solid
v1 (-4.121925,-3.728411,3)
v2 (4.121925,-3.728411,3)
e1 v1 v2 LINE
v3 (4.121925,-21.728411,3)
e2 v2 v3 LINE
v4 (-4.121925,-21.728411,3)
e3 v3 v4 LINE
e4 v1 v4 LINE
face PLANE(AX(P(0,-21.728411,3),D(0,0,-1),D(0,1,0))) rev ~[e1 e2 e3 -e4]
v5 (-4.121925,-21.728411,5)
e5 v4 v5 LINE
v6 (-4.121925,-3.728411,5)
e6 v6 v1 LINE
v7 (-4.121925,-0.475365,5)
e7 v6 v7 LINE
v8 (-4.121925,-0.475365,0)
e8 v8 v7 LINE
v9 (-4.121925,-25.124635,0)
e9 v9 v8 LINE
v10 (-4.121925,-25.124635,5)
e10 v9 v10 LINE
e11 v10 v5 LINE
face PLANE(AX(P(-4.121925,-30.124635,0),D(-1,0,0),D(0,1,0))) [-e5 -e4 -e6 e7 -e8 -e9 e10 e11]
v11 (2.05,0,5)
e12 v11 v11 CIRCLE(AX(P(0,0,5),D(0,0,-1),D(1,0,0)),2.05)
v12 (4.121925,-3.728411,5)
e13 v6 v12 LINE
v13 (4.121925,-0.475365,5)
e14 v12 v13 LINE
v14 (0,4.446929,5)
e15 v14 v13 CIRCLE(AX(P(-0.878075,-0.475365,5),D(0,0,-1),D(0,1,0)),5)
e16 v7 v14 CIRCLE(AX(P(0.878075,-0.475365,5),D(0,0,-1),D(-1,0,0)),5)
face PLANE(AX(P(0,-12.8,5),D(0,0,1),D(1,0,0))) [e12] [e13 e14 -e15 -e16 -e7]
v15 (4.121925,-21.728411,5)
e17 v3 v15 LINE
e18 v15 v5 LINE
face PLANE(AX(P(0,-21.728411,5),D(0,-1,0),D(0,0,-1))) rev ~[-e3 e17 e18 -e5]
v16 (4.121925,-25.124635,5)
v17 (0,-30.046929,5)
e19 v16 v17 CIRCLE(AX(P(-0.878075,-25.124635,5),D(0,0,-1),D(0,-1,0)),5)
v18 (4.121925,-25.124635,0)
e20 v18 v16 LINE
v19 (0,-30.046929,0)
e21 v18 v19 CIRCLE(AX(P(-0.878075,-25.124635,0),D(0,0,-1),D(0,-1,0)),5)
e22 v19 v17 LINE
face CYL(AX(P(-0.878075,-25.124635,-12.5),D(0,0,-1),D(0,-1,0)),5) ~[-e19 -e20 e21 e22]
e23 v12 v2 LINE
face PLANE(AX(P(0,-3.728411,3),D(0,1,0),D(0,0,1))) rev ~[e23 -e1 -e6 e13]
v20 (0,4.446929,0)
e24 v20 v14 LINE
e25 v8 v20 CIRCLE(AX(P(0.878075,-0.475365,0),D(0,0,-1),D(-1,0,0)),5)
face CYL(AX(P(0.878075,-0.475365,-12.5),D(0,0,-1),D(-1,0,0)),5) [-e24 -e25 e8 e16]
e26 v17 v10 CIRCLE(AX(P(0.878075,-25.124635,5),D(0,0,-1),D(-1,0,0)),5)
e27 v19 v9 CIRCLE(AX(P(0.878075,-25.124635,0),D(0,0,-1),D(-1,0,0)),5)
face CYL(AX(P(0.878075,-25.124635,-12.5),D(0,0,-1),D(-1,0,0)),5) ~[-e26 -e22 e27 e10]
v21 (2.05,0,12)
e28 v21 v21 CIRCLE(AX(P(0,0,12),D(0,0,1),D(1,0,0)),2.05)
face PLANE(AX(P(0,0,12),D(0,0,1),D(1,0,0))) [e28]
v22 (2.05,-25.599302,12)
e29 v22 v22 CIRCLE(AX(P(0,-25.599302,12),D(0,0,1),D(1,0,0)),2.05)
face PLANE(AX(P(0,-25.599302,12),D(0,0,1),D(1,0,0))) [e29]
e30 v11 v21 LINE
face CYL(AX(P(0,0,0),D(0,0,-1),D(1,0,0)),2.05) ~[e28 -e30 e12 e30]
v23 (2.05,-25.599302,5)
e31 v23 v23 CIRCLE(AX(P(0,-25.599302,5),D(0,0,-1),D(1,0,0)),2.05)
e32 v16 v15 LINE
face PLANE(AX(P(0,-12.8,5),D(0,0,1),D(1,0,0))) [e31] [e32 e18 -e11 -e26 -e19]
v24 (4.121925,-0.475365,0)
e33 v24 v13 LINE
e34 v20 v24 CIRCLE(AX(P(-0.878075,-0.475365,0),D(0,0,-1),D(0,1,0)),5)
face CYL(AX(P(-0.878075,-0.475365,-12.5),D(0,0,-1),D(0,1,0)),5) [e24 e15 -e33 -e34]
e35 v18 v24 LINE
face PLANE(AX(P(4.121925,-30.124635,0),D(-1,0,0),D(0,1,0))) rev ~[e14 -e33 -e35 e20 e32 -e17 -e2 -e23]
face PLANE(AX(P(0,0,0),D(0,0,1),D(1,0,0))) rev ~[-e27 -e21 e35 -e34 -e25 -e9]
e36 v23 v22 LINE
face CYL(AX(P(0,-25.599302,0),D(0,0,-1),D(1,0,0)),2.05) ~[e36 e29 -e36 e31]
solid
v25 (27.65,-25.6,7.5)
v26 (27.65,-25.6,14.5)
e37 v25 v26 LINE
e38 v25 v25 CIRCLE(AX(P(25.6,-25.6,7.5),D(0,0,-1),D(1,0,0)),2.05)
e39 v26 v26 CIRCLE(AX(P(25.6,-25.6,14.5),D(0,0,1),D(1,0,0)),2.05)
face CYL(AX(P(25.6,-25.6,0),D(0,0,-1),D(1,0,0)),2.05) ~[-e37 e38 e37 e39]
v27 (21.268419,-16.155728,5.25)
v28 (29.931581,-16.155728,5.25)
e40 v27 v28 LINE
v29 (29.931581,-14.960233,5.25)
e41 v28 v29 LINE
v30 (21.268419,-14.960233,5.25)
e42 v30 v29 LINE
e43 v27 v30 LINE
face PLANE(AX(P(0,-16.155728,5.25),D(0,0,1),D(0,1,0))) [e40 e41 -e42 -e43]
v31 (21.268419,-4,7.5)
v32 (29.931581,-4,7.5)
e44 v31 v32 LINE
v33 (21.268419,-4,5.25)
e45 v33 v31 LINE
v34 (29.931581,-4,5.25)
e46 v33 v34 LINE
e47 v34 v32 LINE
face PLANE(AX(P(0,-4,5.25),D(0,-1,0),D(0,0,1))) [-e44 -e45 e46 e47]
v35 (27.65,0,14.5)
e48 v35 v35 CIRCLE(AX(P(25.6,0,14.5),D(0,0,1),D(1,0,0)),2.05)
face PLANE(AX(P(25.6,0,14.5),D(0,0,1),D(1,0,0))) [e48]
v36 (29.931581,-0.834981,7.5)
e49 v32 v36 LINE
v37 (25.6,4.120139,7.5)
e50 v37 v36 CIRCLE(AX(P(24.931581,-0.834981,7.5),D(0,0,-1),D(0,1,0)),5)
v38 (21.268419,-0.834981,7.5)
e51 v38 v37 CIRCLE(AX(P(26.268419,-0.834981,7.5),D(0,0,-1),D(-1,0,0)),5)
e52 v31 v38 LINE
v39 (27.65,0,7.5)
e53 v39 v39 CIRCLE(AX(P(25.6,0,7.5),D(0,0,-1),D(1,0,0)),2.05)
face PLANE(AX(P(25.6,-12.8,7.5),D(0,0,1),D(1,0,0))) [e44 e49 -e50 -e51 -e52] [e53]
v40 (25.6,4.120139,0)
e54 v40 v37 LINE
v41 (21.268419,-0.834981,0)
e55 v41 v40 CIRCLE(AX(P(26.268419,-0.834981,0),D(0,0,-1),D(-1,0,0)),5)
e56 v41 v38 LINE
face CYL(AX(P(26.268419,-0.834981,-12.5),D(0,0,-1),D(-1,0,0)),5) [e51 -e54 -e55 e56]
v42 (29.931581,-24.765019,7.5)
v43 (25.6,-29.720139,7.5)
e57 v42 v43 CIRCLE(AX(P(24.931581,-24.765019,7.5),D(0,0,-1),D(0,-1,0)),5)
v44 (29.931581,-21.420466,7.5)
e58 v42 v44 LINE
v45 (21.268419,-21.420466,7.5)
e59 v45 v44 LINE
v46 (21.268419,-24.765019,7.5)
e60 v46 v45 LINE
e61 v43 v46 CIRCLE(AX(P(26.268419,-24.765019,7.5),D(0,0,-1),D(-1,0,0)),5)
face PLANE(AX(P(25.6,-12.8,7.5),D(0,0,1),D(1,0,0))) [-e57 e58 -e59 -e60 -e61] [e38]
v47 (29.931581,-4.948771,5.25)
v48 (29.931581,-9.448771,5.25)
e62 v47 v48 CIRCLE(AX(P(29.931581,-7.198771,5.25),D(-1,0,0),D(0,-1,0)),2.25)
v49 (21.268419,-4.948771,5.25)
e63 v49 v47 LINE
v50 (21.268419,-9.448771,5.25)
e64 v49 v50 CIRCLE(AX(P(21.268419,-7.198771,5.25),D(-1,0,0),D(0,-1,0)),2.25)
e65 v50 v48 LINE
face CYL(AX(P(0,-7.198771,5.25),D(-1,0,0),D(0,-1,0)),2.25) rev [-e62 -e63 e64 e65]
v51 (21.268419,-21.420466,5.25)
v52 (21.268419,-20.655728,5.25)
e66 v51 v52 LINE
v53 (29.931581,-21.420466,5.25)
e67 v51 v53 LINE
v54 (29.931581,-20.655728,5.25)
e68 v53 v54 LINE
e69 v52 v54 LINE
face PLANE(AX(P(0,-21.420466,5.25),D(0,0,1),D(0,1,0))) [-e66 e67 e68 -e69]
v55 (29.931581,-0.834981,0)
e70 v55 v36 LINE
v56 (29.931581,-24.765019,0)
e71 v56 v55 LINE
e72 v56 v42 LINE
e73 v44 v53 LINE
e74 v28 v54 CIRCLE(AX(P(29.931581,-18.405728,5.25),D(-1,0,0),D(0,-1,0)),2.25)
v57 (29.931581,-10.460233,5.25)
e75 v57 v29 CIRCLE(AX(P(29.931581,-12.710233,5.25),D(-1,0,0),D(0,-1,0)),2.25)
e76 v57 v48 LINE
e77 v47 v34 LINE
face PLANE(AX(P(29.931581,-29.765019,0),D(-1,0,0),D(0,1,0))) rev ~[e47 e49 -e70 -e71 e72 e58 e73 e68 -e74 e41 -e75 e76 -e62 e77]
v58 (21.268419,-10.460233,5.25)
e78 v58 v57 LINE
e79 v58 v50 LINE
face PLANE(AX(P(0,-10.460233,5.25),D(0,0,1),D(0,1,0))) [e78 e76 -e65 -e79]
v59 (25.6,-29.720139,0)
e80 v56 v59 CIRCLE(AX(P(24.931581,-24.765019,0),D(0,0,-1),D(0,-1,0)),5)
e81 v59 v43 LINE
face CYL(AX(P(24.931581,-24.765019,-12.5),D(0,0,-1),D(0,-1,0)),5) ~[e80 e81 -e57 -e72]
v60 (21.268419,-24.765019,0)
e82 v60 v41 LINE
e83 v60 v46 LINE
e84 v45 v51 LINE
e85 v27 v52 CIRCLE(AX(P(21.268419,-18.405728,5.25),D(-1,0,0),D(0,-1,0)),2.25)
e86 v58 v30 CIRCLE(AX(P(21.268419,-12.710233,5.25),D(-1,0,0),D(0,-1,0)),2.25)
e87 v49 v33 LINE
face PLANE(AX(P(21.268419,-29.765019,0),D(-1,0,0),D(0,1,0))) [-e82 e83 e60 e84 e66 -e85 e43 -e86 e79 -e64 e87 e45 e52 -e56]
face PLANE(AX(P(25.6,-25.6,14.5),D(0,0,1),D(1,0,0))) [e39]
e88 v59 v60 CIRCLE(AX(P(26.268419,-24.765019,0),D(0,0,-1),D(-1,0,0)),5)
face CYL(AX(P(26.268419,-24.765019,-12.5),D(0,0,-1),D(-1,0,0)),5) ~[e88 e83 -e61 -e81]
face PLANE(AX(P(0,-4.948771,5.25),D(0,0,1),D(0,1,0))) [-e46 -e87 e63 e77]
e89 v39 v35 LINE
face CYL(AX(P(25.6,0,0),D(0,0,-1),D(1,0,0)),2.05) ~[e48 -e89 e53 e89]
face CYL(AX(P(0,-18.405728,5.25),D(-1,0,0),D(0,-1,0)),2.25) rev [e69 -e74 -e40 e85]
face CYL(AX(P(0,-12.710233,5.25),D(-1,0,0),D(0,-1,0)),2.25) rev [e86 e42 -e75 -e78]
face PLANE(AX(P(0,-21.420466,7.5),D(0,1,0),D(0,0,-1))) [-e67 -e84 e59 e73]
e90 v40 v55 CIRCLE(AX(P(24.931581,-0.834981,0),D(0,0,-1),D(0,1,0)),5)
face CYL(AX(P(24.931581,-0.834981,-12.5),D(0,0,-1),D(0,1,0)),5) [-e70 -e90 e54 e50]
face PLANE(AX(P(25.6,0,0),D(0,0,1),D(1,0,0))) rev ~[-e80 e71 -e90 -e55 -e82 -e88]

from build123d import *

# Parameters (mm, degrees)
F0_W         = 8.2438504323
F0_H         = 34.6492690086
F1_DEPTH     = 5
F2_R         = 2.05
F3_DEPTH     = 12
F5_DEPTH     = 12.5
F6_T1_DEPTH  = 30
F7_W         = 8.6631612957
F7_H         = 33.9300383866
F7_R         = 2.05
F8_DEPTH     = 7.5
F9_DEPTH     = 14.5
F10_T1_DEPTH = 32.5
F12_DEPTH    = 29.9325806478


# Not quite as in the source:
# - a fillet or chamfer that OpenCascade refuses, or shapes differently, is made with other operations: its cross-section is extruded or revolved along the edge and cut away or added


with BuildPart() as f1:
    # F0 (on Top) → F1 (new body)
    with BuildSketch(Plane.XY):
        with Locations((0, -12.8)):
            Rectangle(F0_W, F0_H)
        with BuildLine():
            ThreePointArc((1.9, -25.6), (-1.3435028843, -26.9435028843), (0, -23.7))
            ThreePointArc((0, -23.7), (1.3435028843, -24.2564971157), (1.9, -25.6))
        make_face(mode=Mode.SUBTRACT)
        with BuildLine():
            ThreePointArc((0, -1.9), (-1.3435028843, 1.3435028843), (1.9, 0))
            ThreePointArc((1.9, 0), (1.3435028843, -1.3435028843), (0, -1.9))
        make_face(mode=Mode.SUBTRACT)
        with BuildLine():
            ThreePointArc((0, -1.9), (1.3435028843, -1.3435028843), (1.9, 0))
            ThreePointArc((1.9, 0), (-1.3435028843, 1.3435028843), (0, -1.9))
        make_face()
        with BuildLine():
            ThreePointArc((1.9, -25.6), (1.3435028843, -24.2564971157), (0, -23.7))
            ThreePointArc((0, -23.7), (-1.3435028843, -26.9435028843), (1.9, -25.6))
        make_face()
    extrude(amount=F1_DEPTH)

    # F2 (on Top) → F3 (join)
    with BuildSketch(Plane.XY):
        Circle(F2_R)
        with Locations((0, -25.5993018519)):
            Circle(F2_R)
    extrude(amount=F3_DEPTH)

    # F4 (on Right) → F5 (cut, symmetric)
    with BuildSketch(Plane.YZ):
        Polygon((-21.728410773, 3), (-12.728410773, 3), (-3.728410773, 3), (-3.728410773, 5), (-21.728410773, 5), align=None)
    extrude(amount=F5_DEPTH, both=True, mode=Mode.SUBTRACT)

    # F6: fillet of radius 5 on 4 edges, made by hand

    # F6_s2 → F6_t1 (cut)
    with BuildSketch(Plane.XY.offset(-12.5)):
        with BuildLine():
            ThreePointArc((-0.8780747838, 4.5246345043), (2.6574591221, 3.0601684103), (4.1219252162, -0.4753654957))
            Line((4.1219252162, -0.4753654957), (4.1219252162, 4.5246345043))
            Line((4.1219252162, 4.5246345043), (-0.8780747838, 4.5246345043))
        make_face()
        with BuildLine():
            ThreePointArc((-4.1219252162, -0.4753654957), (-2.6574591221, 3.0601684103), (0.8780747838, 4.5246345043))
            Line((0.8780747838, 4.5246345043), (-4.1219252162, 4.5246345043))
            Line((-4.1219252162, 4.5246345043), (-4.1219252162, -0.4753654957))
        make_face()
        with BuildLine():
            ThreePointArc((-4.1219252162, -25.1246345043), (-2.6574591221, -28.6601684103), (0.8780747838, -30.1246345043))
            Line((0.8780747838, -30.1246345043), (-4.1219252162, -30.1246345043))
            Line((-4.1219252162, -30.1246345043), (-4.1219252162, -25.1246345043))
        make_face()
        with BuildLine():
            ThreePointArc((-0.8780747838, -30.1246345043), (2.6574591221, -28.6601684103), (4.1219252162, -25.1246345043))
            Line((4.1219252162, -25.1246345043), (4.1219252162, -30.1246345043))
            Line((4.1219252162, -30.1246345043), (-0.8780747838, -30.1246345043))
        make_face()
    extrude(amount=F6_T1_DEPTH, mode=Mode.SUBTRACT)


with BuildPart() as f8:
    # F7 (on Top) → F8 (new body)
    with BuildSketch(Plane.XY):
        with Locations((25.6, -12.8)):
            Rectangle(F7_W, F7_H)
        with Locations((25.6, -25.6)):
            Circle(F7_R, mode=Mode.SUBTRACT)
        with Locations((25.6, 0)):
            Circle(F7_R, mode=Mode.SUBTRACT)
        with Locations((25.6, -25.6)):
            Circle(F7_R)
        with Locations((25.6, 0)):
            Circle(F7_R)
    extrude(amount=F8_DEPTH)

    # F7 (on Top) → F9 (join)
    with BuildSketch(Plane.XY):
        with Locations((25.6, 0)):
            Circle(F7_R)
        with Locations((25.6, -25.6)):
            Circle(F7_R)
    extrude(amount=F9_DEPTH)

    # F10: fillet of radius 5 on 4 edges, made by hand

    # F10_s2 → F10_t1 (cut)
    with BuildSketch(Plane.XY.offset(-12.5)):
        with BuildLine():
            ThreePointArc((24.9315806478, 4.1650191933), (28.4671145538, 2.7005530992), (29.9315806478, -0.8349808067))
            Line((29.9315806478, -0.8349808067), (29.9315806478, 4.1650191933))
            Line((29.9315806478, 4.1650191933), (24.9315806478, 4.1650191933))
        make_face()
        with BuildLine():
            ThreePointArc((24.9315806478, -29.7650191933), (28.4671145538, -28.3005530992), (29.9315806478, -24.7650191933))
            Line((29.9315806478, -24.7650191933), (29.9315806478, -29.7650191933))
            Line((29.9315806478, -29.7650191933), (24.9315806478, -29.7650191933))
        make_face()
        with BuildLine():
            ThreePointArc((21.2684193522, -24.7650191933), (22.7328854462, -28.3005530992), (26.2684193522, -29.7650191933))
            Line((26.2684193522, -29.7650191933), (21.2684193522, -29.7650191933))
            Line((21.2684193522, -29.7650191933), (21.2684193522, -24.7650191933))
        make_face()
        with BuildLine():
            ThreePointArc((21.2684193522, -0.8349808067), (22.7328854462, 2.7005530992), (26.2684193522, 4.1650191933))
            Line((26.2684193522, 4.1650191933), (21.2684193522, 4.1650191933))
            Line((21.2684193522, 4.1650191933), (21.2684193522, -0.8349808067))
        make_face()
    extrude(amount=F10_T1_DEPTH, mode=Mode.SUBTRACT)

    # F11 (on Right) → F12 (cut, through all)
    with BuildSketch(Plane.YZ):
        with BuildLine():
            Line((-4.9487714618, 5.25), (-4, 5.25))
            Line((-4, 5.25), (-4, 7.5))
            Line((-4, 7.5), (-21.4204657823, 7.5))
            Line((-21.4204657823, 7.5), (-21.4204657823, 5.25))
            Line((-21.4204657823, 5.25), (-20.6557280421, 5.25))
            ThreePointArc((-20.6557280421, 5.25), (-18.4057280421, 3), (-16.1557280421, 5.25))
            Line((-16.1557280421, 5.25), (-14.9602328911, 5.25))
            ThreePointArc((-14.9602328911, 5.25), (-12.7102328911, 3), (-10.4602328911, 5.25))
            Line((-10.4602328911, 5.25), (-9.4487714618, 5.25))
            ThreePointArc((-9.4487714618, 5.25), (-7.1987714618, 3), (-4.9487714618, 5.25))
        make_face()
    extrude(amount=F12_DEPTH, mode=Mode.SUBTRACT)


solid = Compound([f1.part, f8.part])
